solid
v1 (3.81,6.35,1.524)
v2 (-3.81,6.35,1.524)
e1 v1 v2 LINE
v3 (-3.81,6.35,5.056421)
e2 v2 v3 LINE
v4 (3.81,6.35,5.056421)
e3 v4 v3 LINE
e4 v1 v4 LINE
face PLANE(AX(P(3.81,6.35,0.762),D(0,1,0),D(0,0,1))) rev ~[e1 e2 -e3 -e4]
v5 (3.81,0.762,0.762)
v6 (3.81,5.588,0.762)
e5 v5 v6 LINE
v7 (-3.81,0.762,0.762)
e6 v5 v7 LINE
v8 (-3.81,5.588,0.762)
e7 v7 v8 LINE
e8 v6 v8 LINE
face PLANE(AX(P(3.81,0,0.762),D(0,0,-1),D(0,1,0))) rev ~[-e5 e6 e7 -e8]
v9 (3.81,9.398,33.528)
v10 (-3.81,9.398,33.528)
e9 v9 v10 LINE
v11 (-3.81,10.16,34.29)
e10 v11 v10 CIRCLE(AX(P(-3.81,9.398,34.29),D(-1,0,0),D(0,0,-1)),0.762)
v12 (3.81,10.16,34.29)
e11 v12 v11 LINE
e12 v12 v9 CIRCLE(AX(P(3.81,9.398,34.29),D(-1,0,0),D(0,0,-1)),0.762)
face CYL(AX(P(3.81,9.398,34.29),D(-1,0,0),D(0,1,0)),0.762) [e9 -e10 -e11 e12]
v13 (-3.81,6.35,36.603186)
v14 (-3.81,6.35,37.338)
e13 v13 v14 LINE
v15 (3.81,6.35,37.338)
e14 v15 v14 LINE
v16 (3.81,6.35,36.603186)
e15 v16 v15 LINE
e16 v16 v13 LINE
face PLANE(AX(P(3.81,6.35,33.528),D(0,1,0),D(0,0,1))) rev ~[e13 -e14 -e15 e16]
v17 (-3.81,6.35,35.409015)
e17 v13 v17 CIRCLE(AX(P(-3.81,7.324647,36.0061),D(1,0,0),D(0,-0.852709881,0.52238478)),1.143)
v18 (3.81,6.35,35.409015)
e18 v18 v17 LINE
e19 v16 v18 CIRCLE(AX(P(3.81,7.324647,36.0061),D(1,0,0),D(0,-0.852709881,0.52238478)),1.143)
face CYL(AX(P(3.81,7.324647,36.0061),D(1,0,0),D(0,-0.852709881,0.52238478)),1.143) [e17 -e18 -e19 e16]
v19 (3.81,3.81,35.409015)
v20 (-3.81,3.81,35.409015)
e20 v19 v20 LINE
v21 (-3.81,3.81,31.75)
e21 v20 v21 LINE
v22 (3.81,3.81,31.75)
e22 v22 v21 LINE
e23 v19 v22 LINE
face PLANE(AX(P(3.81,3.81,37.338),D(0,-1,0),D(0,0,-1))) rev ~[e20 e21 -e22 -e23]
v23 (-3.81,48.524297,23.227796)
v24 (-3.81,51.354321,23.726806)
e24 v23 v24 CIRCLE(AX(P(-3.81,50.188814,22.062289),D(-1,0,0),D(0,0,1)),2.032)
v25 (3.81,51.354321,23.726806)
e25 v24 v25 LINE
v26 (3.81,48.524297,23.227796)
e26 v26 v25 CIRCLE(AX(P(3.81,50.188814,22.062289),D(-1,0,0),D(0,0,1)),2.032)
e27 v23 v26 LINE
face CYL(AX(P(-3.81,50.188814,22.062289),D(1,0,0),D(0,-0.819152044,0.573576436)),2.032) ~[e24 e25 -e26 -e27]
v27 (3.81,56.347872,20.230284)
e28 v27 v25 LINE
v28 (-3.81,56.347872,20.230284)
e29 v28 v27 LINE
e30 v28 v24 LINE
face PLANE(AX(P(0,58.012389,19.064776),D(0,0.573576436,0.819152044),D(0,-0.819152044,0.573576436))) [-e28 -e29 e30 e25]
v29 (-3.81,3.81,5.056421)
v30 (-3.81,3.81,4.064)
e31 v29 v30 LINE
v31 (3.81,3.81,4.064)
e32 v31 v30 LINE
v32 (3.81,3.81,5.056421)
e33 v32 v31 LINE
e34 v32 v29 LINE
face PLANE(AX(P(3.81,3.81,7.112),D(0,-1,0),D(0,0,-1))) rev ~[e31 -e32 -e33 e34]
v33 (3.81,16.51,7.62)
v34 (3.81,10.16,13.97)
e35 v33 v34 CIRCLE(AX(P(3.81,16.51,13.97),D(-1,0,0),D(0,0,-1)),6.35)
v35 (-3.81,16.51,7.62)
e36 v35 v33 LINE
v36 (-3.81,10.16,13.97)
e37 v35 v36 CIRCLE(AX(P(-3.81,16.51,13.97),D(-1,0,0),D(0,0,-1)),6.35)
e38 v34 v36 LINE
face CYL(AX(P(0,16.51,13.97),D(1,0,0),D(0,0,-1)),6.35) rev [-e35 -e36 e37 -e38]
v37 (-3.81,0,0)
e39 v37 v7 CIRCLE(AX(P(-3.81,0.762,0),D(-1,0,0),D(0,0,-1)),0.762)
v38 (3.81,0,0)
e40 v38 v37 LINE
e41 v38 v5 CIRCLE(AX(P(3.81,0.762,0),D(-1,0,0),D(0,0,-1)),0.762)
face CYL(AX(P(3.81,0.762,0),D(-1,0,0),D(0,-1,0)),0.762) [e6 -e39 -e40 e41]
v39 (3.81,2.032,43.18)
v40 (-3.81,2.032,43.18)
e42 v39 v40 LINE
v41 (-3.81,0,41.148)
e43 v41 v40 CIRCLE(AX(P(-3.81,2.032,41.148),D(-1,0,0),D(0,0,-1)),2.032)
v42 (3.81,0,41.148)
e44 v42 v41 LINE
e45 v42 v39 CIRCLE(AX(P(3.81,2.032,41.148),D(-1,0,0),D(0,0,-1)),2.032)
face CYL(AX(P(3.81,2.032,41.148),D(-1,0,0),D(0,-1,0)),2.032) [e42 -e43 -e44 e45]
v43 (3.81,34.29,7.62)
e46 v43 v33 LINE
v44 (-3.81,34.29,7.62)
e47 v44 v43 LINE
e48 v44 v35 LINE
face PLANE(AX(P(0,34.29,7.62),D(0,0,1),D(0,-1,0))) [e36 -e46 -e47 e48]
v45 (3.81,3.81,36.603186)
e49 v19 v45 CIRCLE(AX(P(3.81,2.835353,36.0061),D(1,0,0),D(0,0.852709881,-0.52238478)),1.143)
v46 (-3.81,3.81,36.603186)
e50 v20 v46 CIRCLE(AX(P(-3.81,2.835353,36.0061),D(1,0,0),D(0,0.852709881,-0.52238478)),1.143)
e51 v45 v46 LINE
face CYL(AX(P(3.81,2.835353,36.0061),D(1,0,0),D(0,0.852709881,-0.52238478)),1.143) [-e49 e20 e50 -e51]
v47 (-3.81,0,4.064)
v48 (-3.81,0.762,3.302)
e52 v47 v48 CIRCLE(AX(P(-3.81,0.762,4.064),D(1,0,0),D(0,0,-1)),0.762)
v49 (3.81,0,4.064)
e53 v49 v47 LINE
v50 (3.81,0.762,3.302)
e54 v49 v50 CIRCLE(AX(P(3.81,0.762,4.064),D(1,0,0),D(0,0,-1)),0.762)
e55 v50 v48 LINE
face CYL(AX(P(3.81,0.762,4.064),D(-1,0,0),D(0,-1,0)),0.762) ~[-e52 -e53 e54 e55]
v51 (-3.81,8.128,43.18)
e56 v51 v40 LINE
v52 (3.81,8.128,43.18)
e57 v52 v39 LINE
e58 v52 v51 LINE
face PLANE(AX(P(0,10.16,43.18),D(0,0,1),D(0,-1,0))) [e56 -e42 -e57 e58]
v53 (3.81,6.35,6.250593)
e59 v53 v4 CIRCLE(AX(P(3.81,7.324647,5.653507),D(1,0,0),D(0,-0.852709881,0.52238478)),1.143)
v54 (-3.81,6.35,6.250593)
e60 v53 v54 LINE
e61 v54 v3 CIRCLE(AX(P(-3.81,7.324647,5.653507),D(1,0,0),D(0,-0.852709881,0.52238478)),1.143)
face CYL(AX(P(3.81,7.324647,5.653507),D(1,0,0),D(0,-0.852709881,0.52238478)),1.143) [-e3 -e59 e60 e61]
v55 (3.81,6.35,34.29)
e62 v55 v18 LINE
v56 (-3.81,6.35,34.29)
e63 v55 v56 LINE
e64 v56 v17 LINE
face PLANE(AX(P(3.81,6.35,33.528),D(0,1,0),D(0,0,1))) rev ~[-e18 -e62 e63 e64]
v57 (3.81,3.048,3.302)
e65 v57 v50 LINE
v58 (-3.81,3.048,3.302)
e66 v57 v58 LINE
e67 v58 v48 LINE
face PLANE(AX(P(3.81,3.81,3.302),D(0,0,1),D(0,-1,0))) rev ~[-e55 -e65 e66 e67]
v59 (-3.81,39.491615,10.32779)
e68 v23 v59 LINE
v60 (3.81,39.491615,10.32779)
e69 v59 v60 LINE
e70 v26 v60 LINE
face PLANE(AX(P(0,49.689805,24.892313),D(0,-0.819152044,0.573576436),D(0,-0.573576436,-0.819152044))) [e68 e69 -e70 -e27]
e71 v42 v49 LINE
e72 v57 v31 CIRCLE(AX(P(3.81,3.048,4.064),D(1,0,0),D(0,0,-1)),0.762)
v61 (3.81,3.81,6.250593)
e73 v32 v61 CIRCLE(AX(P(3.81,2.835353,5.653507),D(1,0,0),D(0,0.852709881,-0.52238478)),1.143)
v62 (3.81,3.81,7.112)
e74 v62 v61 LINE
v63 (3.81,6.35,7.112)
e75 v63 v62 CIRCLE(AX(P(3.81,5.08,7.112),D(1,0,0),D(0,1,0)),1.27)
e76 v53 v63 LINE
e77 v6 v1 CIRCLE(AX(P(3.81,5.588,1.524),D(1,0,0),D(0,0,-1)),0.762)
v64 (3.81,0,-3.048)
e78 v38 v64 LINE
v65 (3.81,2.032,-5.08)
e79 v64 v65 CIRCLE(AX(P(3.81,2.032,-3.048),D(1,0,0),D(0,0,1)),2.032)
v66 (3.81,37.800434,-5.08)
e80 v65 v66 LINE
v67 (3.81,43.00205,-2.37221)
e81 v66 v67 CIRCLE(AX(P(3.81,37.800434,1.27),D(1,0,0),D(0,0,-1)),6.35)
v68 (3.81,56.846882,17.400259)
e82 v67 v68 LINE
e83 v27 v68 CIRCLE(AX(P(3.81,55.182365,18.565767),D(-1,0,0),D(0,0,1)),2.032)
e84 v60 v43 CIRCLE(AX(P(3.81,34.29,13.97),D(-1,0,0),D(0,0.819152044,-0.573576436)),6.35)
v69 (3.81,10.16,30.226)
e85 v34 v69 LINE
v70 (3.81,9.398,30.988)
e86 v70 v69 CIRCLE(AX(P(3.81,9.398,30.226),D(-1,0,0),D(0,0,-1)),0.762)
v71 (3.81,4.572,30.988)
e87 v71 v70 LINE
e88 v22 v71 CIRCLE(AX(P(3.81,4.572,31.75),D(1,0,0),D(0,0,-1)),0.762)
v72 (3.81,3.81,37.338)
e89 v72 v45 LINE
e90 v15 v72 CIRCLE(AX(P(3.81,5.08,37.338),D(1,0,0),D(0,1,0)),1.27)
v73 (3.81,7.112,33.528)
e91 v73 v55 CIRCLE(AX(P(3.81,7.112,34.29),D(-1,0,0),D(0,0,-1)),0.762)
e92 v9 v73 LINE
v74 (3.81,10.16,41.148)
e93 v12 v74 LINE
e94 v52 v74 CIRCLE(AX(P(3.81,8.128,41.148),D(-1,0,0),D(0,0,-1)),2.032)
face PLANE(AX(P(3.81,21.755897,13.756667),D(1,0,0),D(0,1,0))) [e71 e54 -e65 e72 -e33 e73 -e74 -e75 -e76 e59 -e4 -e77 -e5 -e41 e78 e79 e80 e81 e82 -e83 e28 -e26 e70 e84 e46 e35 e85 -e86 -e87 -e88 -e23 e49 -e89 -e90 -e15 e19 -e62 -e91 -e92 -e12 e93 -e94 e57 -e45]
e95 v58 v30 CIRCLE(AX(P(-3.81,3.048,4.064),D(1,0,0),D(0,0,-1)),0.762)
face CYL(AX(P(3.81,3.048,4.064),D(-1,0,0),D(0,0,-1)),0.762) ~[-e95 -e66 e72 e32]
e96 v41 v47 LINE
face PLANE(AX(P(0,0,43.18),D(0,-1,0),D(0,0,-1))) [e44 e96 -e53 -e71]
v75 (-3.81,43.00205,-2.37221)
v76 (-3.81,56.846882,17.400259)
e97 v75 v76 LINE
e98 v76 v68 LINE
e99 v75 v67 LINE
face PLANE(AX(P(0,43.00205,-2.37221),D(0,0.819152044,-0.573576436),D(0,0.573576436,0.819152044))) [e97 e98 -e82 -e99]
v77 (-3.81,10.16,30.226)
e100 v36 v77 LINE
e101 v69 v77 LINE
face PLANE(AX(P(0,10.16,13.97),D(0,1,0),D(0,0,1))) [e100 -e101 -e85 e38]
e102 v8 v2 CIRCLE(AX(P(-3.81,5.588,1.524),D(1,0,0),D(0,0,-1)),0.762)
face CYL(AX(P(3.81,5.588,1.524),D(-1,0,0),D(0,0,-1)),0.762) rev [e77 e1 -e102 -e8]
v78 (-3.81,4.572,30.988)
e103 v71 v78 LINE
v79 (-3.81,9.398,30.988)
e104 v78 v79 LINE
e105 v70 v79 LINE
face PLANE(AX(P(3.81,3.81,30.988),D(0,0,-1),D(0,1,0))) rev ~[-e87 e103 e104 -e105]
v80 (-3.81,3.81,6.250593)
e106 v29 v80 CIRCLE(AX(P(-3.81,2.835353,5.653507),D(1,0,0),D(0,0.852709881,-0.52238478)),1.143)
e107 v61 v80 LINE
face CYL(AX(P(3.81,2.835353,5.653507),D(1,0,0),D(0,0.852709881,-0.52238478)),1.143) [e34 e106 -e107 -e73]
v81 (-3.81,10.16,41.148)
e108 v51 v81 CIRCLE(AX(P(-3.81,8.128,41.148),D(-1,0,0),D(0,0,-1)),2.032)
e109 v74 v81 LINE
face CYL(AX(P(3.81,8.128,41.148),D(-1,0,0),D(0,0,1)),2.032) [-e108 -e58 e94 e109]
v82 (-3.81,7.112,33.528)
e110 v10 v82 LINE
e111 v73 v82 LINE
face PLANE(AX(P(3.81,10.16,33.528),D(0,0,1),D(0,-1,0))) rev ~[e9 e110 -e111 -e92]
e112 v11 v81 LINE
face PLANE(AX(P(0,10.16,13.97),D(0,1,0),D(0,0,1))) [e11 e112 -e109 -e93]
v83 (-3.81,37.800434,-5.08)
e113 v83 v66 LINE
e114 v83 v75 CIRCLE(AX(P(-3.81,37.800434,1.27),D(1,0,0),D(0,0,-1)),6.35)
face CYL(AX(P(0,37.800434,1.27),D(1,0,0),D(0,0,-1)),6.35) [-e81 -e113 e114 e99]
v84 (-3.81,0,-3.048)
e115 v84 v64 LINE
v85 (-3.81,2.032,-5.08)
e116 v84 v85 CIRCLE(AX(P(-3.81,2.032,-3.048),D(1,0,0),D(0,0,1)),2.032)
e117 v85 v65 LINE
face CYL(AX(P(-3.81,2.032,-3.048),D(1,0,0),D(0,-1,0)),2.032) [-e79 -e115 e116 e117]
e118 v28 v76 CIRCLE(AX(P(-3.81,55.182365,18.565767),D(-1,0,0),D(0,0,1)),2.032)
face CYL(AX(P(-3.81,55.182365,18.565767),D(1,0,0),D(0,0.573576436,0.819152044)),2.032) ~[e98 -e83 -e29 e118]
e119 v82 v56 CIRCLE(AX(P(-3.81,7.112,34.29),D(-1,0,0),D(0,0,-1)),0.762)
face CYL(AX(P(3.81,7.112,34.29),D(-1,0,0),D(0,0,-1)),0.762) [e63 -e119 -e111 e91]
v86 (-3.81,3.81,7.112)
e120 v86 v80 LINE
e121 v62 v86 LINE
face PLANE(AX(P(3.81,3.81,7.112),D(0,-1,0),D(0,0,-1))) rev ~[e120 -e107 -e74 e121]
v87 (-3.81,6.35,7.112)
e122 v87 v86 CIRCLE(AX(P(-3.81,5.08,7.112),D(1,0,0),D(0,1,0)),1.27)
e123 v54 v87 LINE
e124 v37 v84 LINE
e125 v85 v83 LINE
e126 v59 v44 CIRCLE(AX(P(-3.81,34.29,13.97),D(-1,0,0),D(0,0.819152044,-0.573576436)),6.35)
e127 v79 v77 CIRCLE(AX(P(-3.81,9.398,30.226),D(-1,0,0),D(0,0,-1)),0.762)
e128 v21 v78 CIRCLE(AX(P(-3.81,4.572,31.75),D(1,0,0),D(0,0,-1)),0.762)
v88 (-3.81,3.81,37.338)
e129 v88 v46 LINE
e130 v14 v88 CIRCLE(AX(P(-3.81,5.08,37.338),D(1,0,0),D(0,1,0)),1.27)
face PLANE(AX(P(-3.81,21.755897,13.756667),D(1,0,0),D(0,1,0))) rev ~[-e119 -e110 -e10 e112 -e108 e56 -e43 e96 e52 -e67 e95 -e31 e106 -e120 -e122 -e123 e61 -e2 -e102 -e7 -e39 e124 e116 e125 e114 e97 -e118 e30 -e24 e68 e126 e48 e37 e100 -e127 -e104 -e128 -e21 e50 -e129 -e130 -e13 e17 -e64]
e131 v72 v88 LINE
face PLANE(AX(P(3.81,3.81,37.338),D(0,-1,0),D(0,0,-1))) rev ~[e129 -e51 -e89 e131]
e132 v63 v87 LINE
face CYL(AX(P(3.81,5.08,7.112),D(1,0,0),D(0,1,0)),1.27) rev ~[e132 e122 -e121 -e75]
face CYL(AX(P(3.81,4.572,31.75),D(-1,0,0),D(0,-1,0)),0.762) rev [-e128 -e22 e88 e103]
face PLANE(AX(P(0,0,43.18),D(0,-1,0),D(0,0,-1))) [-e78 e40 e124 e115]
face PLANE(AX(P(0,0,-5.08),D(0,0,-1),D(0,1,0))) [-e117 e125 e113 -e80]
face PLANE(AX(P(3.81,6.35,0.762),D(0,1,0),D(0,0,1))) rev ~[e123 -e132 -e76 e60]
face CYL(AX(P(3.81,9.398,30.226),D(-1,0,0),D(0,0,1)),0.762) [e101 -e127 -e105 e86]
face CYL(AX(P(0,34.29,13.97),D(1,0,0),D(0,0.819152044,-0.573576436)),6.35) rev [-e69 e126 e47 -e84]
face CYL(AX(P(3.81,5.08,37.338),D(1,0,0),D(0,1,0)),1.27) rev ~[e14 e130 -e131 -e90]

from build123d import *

# Parameters (mm, degrees)
F1_DEPTH = 3.81
F2_R     = 2.032
F4_DEPTH = 7.621
F5_R     = 0.762
F7_DEPTH = 7.62


# Not quite as in the source:
# - a feature names something its author has since deleted; it is built from what else it names


with BuildPart() as f1:
    # F0 (on Right) → F1 (new body, symmetric)
    with BuildSketch(Plane.YZ):
        with BuildLine():
            Line((0, 43.18), (0, 0))
            Line((0, 0), (0, -5.08))
            Line((0, -5.08), (37.8004340866, -5.08))
            ThreePointArc((37.8004340866, -5.08), (40.7325377806, -4.3625187907), (43.0020495678, -2.3722103708))
            Line((43.0020495678, -2.3722103708), (58.0123892895, 19.0647763833))
            Line((58.0123892895, 19.0647763833), (49.6898045196, 24.8923129766))
            Line((49.6898045196, 24.8923129766), (39.4916154812, 10.3277896292))
            ThreePointArc((39.4916154812, 10.3277896292), (37.222103694, 8.3374812093), (34.29, 7.62))
            Line((34.29, 7.62), (16.51, 7.62))
            ThreePointArc((16.51, 7.62), (12.0198719395, 9.4798719395), (10.16, 13.97))
            Line((10.16, 13.97), (10.16, 43.18))
            Line((10.16, 43.18), (0, 43.18))
        make_face()
    extrude(amount=F1_DEPTH, both=True)

    # F2
    f2_edges = [f1.edges().sort_by_distance(p)[0] for p in [
        (0, 10.16, 43.18),
        (0, 0, 43.18),
        (0, 49.689805, 24.892313),
        (0, 58.012389, 19.064776),
        (0, 0, -5.08),
    ]]
    fillet(f2_edges, radius=F2_R)

    # F3 (on face) → F4 (cut, through all)
    with BuildSketch(Plane.YZ.offset(3.81)):
        with BuildLine():
            Line((6.35, 33.528), (6.35, 37.338))
            ThreePointArc((6.35, 37.338), (5.08, 38.608), (3.81, 37.338))
            Line((3.81, 37.338), (3.81, 30.988))
            Line((3.81, 30.988), (10.16, 30.988))
            Line((10.16, 30.988), (10.16, 33.528))
            Line((10.16, 33.528), (6.35, 33.528))
        make_face()
        with BuildLine():
            Line((6.35, 0.762), (6.35, 7.112))
            ThreePointArc((6.35, 7.112), (5.08, 8.382), (3.81, 7.112))
            Line((3.81, 7.112), (3.81, 3.302))
            Line((3.81, 3.302), (0, 3.302))
            Line((0, 3.302), (0, 0.762))
            Line((0, 0.762), (6.35, 0.762))
        make_face()
    extrude(amount=-F4_DEPTH, mode=Mode.SUBTRACT)

    # F5
    f5_edges = [f1.edges().sort_by_distance(p)[0] for p in [
        (0, 6.35, 33.528),
        (0, 10.16, 33.528),
        (0, 3.81, 30.988),
        (0, 10.16, 30.988),
        (0, 0, 3.302),
        (0, 6.35, 0.762),
        (0, 0, 0.762),
        (0, 3.81, 3.302),
    ]]
    fillet(f5_edges, radius=F5_R)

    # F6 (on face) → F7 (join, through all)
    with BuildSketch(Plane.YZ.offset(3.81)):
        with BuildLine():
            Line((6.35, 35.4090145557), (6.35, 36.6031861632))
            ThreePointArc((6.35, 36.6031861632), (6.1816473942, 36.0061003594), (6.35, 35.4090145557))
        make_face()
        with BuildLine():
            Line((3.81, 36.6031861632), (3.81, 35.4090145557))
            ThreePointArc((3.81, 35.4090145557), (3.9783526058, 36.0061003594), (3.81, 36.6031861632))
        make_face()
        with BuildLine():
            Line((3.81, 6.2505925306), (3.81, 5.0564209231))
            ThreePointArc((3.81, 5.0564209231), (3.9783526058, 5.6535067269), (3.81, 6.2505925306))
        make_face()
        with BuildLine():
            ThreePointArc((6.35, 6.2505925306), (6.1816473942, 5.6535067269), (6.35, 5.0564209231))
            Line((6.35, 5.0564209231), (6.35, 6.2505925306))
        make_face()
    extrude(amount=-F7_DEPTH)


solid = f1.part
